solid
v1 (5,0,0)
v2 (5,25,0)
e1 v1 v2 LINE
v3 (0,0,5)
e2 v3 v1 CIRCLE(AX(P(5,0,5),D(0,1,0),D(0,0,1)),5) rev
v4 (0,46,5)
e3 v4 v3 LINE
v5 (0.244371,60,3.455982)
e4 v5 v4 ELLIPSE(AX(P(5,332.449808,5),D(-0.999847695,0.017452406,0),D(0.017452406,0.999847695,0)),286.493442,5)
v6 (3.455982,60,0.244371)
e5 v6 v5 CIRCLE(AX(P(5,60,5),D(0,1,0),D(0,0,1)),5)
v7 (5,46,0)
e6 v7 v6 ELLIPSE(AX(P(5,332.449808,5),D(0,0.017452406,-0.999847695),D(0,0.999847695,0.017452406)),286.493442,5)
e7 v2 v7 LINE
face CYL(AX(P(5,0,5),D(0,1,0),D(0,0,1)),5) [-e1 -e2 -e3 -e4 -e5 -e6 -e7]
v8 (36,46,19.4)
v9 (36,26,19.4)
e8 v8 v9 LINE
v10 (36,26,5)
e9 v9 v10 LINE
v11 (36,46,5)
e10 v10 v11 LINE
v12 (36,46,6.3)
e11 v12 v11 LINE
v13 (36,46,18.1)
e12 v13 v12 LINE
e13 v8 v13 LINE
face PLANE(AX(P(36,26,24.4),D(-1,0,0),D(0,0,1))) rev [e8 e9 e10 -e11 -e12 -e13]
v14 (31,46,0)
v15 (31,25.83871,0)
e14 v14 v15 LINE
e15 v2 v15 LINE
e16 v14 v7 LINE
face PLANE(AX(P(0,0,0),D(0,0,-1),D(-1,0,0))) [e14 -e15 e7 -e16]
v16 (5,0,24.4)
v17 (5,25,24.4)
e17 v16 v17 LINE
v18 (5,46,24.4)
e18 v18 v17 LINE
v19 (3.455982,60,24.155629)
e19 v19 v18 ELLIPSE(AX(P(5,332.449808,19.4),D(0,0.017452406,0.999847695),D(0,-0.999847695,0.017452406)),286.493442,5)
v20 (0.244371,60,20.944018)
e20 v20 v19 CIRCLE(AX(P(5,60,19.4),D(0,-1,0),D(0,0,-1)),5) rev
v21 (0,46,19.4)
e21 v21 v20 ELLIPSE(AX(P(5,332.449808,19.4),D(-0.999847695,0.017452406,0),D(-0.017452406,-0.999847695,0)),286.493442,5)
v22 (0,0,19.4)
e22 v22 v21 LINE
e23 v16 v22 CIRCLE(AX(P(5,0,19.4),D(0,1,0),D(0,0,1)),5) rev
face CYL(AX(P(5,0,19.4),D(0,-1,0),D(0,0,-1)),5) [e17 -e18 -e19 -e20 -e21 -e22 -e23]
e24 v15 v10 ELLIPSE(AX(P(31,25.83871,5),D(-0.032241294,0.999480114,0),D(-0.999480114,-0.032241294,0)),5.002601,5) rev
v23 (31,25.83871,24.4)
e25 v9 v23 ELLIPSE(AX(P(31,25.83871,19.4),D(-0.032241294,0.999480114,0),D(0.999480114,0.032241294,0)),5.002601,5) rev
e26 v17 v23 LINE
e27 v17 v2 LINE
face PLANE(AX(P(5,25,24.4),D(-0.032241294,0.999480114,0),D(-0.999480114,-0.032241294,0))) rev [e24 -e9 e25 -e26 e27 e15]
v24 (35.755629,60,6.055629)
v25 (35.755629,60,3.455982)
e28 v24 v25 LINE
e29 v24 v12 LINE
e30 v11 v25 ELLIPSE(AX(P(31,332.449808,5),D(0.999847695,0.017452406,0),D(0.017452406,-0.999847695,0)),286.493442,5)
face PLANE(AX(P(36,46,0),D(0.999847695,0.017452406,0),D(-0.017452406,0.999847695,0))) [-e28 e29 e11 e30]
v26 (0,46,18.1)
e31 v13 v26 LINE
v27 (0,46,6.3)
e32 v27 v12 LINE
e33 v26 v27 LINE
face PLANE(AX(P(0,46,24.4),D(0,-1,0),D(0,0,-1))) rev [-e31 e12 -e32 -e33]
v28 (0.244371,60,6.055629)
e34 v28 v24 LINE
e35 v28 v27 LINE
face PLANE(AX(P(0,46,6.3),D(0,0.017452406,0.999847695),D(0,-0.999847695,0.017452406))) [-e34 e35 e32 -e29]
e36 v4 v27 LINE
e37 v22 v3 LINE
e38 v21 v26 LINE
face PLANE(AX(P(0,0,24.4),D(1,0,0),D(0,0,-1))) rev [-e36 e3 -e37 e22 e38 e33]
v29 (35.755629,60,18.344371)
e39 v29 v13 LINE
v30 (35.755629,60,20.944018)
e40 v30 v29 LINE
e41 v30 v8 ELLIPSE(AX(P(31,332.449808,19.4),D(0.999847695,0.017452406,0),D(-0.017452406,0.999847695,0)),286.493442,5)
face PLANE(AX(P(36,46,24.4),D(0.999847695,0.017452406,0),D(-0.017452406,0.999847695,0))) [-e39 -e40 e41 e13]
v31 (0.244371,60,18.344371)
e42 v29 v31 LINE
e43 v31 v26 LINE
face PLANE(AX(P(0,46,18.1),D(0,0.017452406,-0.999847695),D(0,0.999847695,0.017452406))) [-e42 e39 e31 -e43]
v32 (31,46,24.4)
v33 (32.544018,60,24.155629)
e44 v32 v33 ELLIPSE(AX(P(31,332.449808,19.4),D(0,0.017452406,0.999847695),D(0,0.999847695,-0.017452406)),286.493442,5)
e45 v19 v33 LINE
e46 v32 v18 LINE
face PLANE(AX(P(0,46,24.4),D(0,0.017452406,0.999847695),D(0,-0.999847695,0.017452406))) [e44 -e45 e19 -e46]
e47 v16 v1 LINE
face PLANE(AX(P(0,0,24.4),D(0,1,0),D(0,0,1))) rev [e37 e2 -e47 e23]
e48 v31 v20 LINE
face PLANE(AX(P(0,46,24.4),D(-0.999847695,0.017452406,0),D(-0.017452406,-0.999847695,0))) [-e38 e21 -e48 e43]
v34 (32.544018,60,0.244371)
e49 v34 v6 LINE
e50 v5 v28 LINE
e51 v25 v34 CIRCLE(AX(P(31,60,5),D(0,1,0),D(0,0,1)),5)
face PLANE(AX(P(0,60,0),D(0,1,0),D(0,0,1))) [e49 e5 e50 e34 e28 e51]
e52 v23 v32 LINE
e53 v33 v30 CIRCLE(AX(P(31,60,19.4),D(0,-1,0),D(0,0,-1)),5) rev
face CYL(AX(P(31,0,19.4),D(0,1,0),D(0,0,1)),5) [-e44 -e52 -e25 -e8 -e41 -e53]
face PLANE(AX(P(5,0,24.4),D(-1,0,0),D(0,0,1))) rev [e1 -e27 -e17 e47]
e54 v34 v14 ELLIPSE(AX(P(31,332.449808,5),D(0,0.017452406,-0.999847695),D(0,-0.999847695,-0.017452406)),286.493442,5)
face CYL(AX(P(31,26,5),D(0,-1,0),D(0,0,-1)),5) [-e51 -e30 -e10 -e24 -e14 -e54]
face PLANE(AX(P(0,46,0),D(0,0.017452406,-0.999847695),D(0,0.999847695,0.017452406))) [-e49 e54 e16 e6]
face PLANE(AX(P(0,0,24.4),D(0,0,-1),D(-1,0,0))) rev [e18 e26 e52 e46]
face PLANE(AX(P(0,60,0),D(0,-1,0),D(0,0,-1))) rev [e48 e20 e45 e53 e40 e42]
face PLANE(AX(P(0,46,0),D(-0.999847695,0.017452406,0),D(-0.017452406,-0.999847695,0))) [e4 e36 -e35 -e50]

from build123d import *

# Parameters (mm, degrees)
BOSS_EXTRUDE1_DEPTH           = 24.4
SKETCH2_W                     = 36
SKETCH2_H                     = 6.3
BOSS_EXTRUDE2_DEPTH           = 14
BOSS_EXTRUDE2_DRAFT           = 1
BOSS_EXTRUDE2_PROFILE_2_DEPTH = 14
BOSS_EXTRUDE2_PROFILE_2_DRAFT = 1
FILLET1_R                     = 5


with BuildPart() as part:
    # Sketch1 → Boss-Extrude1 (new body)
    with BuildSketch(Plane.XY):
        Polygon((0, 0), (5, 0), (5, 25), (36, 26), (36, 46), (0, 46), align=None)
    extrude(amount=BOSS_EXTRUDE1_DEPTH)


with BuildPart() as boss_extrude2_tool:
    # Sketch2 → Boss-Extrude2 (with draft: the straight prism first)
    with BuildSketch(Plane(origin=(0, 46, 0), x_dir=(1, 0, 0), z_dir=(0, 1, 0))):
        with Locations((18, -3.15)):
            Rectangle(SKETCH2_W, SKETCH2_H)
    extrude(amount=BOSS_EXTRUDE2_DEPTH)
    # Boss-Extrude2: the draft: its side faces are tilted about the plane it starts from
    boss_extrude2_sides = [boss_extrude2_tool.faces().sort_by_distance(p)[0] for p in [
        (0, 53, 3.15),
        (18, 53, 6.3),
        (36, 53, 3.15),
        (18, 53, 0),
    ]]
    draft(boss_extrude2_sides, Plane(origin=(0, 46, 0), x_dir=(1, 0, 0), z_dir=(0, 1, 0)), BOSS_EXTRUDE2_DRAFT)


with BuildPart() as part_1:
    add(part.part)

    # Boss-Extrude2: add boss_extrude2_tool
    add(boss_extrude2_tool.part)


with BuildPart() as boss_extrude2_profile_2_tool:
    # Sketch2 → Boss-Extrude2 profile 2 (with draft: the straight prism first)
    with BuildSketch(Plane(origin=(0, 46, 0), x_dir=(1, 0, 0), z_dir=(0, 1, 0))):
        with Locations((18, -21.25)):
            Rectangle(SKETCH2_W, SKETCH2_H)
    extrude(amount=BOSS_EXTRUDE2_PROFILE_2_DEPTH)
    # Boss-Extrude2 profile 2: the draft: its side faces are tilted about the plane it starts from
    boss_extrude2_profile_2_sides = [boss_extrude2_profile_2_tool.faces().sort_by_distance(p)[0] for p in [
        (18, 53, 24.4),
        (36, 53, 21.25),
        (18, 53, 18.1),
        (0, 53, 21.25),
    ]]
    draft(boss_extrude2_profile_2_sides, Plane(origin=(0, 46, 0), x_dir=(1, 0, 0), z_dir=(0, 1, 0)), BOSS_EXTRUDE2_PROFILE_2_DRAFT)


with BuildPart() as part_2:
    add(part_1.part)

    # Boss-Extrude2 profile 2: add boss_extrude2_profile_2_tool
    add(boss_extrude2_profile_2_tool.part)

    # Fillet1
    # the kernel refuses this fillet: 5 mm, written as the material it takes off along each edge
    with BuildSketch(Plane(origin=(36, -4, 24.4), x_dir=(-1, 0, 0), z_dir=(0, 1, 0))) as fillet1_piece_1:
        with BuildLine():
            CenterArc((FILLET1_R, -FILLET1_R), FILLET1_R, 90, 90)
            Line((0, -FILLET1_R), (-FILLET1_R * 0.02, -FILLET1_R))
            Line((-FILLET1_R * 0.02, -FILLET1_R), (-FILLET1_R * 0.02, FILLET1_R * 0.02))
            Line((-FILLET1_R * 0.02, FILLET1_R * 0.02), (FILLET1_R, FILLET1_R * 0.02))
            Line((FILLET1_R, FILLET1_R * 0.02), (FILLET1_R, 0))
        make_face()
    extrude(amount=80, mode=Mode.SUBTRACT)
    with BuildSketch(Plane(origin=(36, -4, 0), x_dir=(-1, 0, 0), z_dir=(0, 1, 0))) as fillet1_piece_2:
        with BuildLine():
            CenterArc((FILLET1_R, FILLET1_R), FILLET1_R, 180, 90)
            Line((0, FILLET1_R), (-FILLET1_R * 0.02, FILLET1_R))
            Line((-FILLET1_R * 0.02, FILLET1_R), (-FILLET1_R * 0.02, -FILLET1_R * 0.02))
            Line((-FILLET1_R * 0.02, -FILLET1_R * 0.02), (FILLET1_R, -FILLET1_R * 0.02))
            Line((FILLET1_R, -FILLET1_R * 0.02), (FILLET1_R, 0))
        make_face()
    extrude(amount=80, mode=Mode.SUBTRACT)
    with BuildSketch(Plane(origin=(0, 76, 0), x_dir=(0, 0, 1), z_dir=(0, -1, 0))) as fillet1_piece_3:
        with BuildLine():
            CenterArc((FILLET1_R, -FILLET1_R), FILLET1_R, 90, 90)
            Line((0, -FILLET1_R), (-FILLET1_R * 0.02, -FILLET1_R))
            Line((-FILLET1_R * 0.02, -FILLET1_R), (-FILLET1_R * 0.02, FILLET1_R * 0.02))
            Line((-FILLET1_R * 0.02, FILLET1_R * 0.02), (FILLET1_R, FILLET1_R * 0.02))
            Line((FILLET1_R, FILLET1_R * 0.02), (FILLET1_R, 0))
        make_face()
    extrude(amount=106, mode=Mode.SUBTRACT)
    with BuildSketch(Plane(origin=(0, 76, 24.4), x_dir=(0, 0, -1), z_dir=(0, -1, 0))) as fillet1_piece_4:
        with BuildLine():
            CenterArc((FILLET1_R, FILLET1_R), FILLET1_R, 180, 90)
            Line((0, FILLET1_R), (-FILLET1_R * 0.02, FILLET1_R))
            Line((-FILLET1_R * 0.02, FILLET1_R), (-FILLET1_R * 0.02, -FILLET1_R * 0.02))
            Line((-FILLET1_R * 0.02, -FILLET1_R * 0.02), (FILLET1_R, -FILLET1_R * 0.02))
            Line((FILLET1_R, -FILLET1_R * 0.02), (FILLET1_R, 0))
        make_face()
    extrude(amount=106, mode=Mode.SUBTRACT)


solid = part_2.part
